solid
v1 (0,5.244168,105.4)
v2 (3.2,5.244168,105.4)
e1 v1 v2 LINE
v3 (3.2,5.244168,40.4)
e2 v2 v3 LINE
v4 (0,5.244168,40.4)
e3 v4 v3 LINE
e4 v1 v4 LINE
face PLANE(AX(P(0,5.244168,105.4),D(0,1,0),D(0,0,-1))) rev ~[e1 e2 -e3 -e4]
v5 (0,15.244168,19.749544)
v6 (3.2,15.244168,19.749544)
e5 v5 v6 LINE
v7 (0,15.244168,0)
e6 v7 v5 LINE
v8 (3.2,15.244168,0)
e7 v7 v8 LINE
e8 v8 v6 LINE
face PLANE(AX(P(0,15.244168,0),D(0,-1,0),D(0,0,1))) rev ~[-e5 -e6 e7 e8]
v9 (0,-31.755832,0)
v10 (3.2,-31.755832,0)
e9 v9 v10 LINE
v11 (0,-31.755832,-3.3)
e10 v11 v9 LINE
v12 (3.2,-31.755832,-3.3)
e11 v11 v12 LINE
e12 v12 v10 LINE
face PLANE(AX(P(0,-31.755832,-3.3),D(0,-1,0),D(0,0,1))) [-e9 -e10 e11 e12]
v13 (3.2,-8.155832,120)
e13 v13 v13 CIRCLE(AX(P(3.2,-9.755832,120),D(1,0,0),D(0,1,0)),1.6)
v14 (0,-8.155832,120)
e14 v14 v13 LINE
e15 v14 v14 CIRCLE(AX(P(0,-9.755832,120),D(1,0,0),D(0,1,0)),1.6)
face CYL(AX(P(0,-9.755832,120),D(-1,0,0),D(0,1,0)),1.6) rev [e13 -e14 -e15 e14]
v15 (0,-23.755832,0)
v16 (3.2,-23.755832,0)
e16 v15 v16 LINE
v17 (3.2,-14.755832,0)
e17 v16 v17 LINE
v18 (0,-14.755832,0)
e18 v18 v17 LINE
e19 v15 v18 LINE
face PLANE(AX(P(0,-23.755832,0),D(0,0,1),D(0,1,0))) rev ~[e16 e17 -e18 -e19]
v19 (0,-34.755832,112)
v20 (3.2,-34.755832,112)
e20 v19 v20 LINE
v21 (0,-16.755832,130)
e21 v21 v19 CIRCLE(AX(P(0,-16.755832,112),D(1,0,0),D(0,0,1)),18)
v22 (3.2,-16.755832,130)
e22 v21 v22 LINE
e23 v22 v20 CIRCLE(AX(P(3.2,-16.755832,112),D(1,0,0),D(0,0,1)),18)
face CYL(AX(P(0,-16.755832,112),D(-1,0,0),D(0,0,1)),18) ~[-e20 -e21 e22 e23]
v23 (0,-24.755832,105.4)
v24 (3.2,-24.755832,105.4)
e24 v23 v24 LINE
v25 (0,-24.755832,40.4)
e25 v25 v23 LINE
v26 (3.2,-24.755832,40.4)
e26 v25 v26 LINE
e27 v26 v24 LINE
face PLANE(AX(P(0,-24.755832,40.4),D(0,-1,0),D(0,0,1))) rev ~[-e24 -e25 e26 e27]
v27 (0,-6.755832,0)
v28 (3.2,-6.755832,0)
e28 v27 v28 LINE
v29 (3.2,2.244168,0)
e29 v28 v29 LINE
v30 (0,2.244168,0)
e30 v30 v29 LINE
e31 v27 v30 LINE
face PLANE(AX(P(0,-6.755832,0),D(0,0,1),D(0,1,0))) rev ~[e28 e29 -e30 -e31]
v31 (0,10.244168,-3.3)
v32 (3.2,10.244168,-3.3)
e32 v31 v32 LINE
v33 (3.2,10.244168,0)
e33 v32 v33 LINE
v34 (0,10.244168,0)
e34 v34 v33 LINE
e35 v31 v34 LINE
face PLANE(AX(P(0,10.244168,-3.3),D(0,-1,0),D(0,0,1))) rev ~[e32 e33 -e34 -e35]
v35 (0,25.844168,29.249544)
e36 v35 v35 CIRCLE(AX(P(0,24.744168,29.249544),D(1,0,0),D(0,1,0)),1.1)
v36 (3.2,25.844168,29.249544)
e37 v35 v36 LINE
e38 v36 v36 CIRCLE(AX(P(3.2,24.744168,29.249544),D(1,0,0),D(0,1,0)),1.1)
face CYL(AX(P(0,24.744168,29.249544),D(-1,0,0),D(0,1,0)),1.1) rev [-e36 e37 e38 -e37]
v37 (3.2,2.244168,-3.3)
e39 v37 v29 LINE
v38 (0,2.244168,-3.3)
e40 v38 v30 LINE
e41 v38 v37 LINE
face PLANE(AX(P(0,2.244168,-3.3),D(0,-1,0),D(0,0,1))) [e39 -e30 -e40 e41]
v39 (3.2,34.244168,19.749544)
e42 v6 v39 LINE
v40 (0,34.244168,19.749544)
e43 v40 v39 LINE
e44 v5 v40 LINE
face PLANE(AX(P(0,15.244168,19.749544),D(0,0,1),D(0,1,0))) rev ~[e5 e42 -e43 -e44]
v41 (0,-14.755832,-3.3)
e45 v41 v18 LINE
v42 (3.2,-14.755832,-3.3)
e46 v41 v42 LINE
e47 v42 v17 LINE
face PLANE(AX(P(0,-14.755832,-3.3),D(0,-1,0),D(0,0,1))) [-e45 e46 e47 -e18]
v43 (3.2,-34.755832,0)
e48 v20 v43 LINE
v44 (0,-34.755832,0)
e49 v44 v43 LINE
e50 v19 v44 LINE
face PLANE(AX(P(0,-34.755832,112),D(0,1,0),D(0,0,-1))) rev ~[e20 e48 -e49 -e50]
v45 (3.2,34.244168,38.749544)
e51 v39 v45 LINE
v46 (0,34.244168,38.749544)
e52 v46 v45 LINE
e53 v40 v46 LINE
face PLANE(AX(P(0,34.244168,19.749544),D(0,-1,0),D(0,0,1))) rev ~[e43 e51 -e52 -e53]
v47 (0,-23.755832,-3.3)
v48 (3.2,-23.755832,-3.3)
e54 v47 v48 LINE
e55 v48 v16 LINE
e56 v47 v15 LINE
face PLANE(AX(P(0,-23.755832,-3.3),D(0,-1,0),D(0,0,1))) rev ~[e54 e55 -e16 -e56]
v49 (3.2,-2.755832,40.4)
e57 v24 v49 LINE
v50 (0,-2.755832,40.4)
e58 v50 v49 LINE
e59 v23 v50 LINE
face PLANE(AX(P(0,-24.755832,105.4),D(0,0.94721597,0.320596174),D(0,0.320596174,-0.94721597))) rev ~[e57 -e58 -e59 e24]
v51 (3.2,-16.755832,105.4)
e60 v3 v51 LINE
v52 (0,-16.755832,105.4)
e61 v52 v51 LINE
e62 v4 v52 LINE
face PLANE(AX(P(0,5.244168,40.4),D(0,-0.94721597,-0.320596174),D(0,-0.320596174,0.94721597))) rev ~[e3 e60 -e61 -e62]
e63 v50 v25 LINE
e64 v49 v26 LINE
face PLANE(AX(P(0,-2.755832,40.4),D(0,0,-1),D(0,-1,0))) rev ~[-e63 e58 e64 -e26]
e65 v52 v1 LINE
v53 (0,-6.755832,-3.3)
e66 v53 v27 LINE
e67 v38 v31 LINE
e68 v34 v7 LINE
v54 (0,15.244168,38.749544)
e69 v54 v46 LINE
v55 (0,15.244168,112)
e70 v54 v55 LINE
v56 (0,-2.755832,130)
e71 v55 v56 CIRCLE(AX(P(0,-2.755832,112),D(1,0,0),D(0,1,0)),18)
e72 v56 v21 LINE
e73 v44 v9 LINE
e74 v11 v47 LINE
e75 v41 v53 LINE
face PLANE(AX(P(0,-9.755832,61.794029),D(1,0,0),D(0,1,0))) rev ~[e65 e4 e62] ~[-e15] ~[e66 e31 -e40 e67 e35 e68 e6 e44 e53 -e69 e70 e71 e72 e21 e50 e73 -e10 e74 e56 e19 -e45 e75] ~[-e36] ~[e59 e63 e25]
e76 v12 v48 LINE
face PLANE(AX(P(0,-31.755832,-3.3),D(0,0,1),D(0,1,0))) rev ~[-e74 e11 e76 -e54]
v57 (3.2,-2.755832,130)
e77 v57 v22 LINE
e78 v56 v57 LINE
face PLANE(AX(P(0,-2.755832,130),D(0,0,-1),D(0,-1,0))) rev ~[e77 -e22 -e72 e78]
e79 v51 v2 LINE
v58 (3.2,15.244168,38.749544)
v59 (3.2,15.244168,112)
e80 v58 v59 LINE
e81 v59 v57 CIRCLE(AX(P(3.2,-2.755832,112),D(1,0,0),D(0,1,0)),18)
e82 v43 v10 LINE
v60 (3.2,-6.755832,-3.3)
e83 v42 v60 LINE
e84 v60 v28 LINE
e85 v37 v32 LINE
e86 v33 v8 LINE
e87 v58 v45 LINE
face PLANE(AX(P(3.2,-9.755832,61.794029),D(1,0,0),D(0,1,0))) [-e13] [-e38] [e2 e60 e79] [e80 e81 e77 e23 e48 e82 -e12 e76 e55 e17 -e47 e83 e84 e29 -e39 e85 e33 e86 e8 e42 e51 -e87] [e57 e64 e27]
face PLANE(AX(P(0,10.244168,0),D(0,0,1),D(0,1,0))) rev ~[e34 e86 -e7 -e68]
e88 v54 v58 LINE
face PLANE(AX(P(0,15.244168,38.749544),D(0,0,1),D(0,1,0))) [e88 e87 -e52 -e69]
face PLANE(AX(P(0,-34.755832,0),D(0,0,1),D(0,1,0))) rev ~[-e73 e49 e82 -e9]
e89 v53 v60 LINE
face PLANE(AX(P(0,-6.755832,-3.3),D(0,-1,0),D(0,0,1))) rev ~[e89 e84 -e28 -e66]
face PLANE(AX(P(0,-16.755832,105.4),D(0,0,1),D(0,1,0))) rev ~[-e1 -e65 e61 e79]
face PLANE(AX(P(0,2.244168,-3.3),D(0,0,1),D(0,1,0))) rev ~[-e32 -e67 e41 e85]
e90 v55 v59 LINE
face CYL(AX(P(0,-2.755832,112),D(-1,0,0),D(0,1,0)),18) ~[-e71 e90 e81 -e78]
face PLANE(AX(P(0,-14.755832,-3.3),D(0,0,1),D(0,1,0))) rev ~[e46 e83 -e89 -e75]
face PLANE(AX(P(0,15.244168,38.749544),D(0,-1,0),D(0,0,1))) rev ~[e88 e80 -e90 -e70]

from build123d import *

# Parameters (mm, degrees)
F0_R     = 1.6
F0_W     = 8
F0_H     = 3.3
F0_W_2   = 19
F0_H_2   = 19
F0_R_2   = 1.1
F1_DEPTH = 3.2


# Not quite as in the source:
# - a feature names something its author has since deleted; it is built from what else it names


with BuildPart() as f1:
    # F0 (on Right) → F1 (new body)
    with BuildSketch(Plane.YZ):
        with BuildLine():
            ThreePointArc((-16.7558317706, 130), (-29.483753832, 124.7279220614), (-34.7558317706, 112))
            Line((-34.7558317706, 112), (-34.7558317706, 0))
            Line((-34.7558317706, 0), (-31.7558317706, 0))
            Line((-31.7558317706, 0), (-23.7558317706, 0))
            Line((-23.7558317706, 0), (-14.7558317706, 0))
            Line((-14.7558317706, 0), (-6.7558317706, 0))
            Line((-6.7558317706, 0), (2.2441682294, 0))
            Line((2.2441682294, 0), (10.2441682294, 0))
            Line((10.2441682294, 0), (15.2441682294, 0))
            Line((15.2441682294, 0), (15.2441682294, 19.74954395))
            Line((15.2441682294, 19.74954395), (15.2441682294, 38.74954395))
            Line((15.2441682294, 38.74954395), (15.2441682294, 112))
            ThreePointArc((15.2441682294, 112), (9.9720902908, 124.7279220614), (-2.7558317706, 130))
            Line((-2.7558317706, 130), (-16.7558317706, 130))
        make_face()
        Polygon((-24.7558317706, 40.4), (-24.7558317706, 105.4), (-16.7558317706, 105.4), (5.2441682294, 105.4), (5.2441682294, 40.4), (-2.7558317706, 40.4), align=None, mode=Mode.SUBTRACT)
        with Locations((-9.7558317706, 120)):
            Circle(F0_R, mode=Mode.SUBTRACT)
        with Locations((-27.7558317706, -1.65)):
            Rectangle(F0_W, F0_H)
        with Locations((-10.7558317706, -1.65)):
            Rectangle(F0_W, F0_H)
        with Locations((24.7441682294, 29.24954395)):
            Rectangle(F0_W_2, F0_H_2)
        with Locations((24.7441682294, 29.24954395)):
            Circle(F0_R_2, mode=Mode.SUBTRACT)
        with Locations((6.2441682294, -1.65)):
            Rectangle(F0_W, F0_H)
        Polygon((-16.7558317706, 105.4), (-24.7558317706, 105.4), (-2.7558317706, 40.4), (5.2441682294, 40.4), align=None)
    extrude(amount=F1_DEPTH)


solid = f1.part
